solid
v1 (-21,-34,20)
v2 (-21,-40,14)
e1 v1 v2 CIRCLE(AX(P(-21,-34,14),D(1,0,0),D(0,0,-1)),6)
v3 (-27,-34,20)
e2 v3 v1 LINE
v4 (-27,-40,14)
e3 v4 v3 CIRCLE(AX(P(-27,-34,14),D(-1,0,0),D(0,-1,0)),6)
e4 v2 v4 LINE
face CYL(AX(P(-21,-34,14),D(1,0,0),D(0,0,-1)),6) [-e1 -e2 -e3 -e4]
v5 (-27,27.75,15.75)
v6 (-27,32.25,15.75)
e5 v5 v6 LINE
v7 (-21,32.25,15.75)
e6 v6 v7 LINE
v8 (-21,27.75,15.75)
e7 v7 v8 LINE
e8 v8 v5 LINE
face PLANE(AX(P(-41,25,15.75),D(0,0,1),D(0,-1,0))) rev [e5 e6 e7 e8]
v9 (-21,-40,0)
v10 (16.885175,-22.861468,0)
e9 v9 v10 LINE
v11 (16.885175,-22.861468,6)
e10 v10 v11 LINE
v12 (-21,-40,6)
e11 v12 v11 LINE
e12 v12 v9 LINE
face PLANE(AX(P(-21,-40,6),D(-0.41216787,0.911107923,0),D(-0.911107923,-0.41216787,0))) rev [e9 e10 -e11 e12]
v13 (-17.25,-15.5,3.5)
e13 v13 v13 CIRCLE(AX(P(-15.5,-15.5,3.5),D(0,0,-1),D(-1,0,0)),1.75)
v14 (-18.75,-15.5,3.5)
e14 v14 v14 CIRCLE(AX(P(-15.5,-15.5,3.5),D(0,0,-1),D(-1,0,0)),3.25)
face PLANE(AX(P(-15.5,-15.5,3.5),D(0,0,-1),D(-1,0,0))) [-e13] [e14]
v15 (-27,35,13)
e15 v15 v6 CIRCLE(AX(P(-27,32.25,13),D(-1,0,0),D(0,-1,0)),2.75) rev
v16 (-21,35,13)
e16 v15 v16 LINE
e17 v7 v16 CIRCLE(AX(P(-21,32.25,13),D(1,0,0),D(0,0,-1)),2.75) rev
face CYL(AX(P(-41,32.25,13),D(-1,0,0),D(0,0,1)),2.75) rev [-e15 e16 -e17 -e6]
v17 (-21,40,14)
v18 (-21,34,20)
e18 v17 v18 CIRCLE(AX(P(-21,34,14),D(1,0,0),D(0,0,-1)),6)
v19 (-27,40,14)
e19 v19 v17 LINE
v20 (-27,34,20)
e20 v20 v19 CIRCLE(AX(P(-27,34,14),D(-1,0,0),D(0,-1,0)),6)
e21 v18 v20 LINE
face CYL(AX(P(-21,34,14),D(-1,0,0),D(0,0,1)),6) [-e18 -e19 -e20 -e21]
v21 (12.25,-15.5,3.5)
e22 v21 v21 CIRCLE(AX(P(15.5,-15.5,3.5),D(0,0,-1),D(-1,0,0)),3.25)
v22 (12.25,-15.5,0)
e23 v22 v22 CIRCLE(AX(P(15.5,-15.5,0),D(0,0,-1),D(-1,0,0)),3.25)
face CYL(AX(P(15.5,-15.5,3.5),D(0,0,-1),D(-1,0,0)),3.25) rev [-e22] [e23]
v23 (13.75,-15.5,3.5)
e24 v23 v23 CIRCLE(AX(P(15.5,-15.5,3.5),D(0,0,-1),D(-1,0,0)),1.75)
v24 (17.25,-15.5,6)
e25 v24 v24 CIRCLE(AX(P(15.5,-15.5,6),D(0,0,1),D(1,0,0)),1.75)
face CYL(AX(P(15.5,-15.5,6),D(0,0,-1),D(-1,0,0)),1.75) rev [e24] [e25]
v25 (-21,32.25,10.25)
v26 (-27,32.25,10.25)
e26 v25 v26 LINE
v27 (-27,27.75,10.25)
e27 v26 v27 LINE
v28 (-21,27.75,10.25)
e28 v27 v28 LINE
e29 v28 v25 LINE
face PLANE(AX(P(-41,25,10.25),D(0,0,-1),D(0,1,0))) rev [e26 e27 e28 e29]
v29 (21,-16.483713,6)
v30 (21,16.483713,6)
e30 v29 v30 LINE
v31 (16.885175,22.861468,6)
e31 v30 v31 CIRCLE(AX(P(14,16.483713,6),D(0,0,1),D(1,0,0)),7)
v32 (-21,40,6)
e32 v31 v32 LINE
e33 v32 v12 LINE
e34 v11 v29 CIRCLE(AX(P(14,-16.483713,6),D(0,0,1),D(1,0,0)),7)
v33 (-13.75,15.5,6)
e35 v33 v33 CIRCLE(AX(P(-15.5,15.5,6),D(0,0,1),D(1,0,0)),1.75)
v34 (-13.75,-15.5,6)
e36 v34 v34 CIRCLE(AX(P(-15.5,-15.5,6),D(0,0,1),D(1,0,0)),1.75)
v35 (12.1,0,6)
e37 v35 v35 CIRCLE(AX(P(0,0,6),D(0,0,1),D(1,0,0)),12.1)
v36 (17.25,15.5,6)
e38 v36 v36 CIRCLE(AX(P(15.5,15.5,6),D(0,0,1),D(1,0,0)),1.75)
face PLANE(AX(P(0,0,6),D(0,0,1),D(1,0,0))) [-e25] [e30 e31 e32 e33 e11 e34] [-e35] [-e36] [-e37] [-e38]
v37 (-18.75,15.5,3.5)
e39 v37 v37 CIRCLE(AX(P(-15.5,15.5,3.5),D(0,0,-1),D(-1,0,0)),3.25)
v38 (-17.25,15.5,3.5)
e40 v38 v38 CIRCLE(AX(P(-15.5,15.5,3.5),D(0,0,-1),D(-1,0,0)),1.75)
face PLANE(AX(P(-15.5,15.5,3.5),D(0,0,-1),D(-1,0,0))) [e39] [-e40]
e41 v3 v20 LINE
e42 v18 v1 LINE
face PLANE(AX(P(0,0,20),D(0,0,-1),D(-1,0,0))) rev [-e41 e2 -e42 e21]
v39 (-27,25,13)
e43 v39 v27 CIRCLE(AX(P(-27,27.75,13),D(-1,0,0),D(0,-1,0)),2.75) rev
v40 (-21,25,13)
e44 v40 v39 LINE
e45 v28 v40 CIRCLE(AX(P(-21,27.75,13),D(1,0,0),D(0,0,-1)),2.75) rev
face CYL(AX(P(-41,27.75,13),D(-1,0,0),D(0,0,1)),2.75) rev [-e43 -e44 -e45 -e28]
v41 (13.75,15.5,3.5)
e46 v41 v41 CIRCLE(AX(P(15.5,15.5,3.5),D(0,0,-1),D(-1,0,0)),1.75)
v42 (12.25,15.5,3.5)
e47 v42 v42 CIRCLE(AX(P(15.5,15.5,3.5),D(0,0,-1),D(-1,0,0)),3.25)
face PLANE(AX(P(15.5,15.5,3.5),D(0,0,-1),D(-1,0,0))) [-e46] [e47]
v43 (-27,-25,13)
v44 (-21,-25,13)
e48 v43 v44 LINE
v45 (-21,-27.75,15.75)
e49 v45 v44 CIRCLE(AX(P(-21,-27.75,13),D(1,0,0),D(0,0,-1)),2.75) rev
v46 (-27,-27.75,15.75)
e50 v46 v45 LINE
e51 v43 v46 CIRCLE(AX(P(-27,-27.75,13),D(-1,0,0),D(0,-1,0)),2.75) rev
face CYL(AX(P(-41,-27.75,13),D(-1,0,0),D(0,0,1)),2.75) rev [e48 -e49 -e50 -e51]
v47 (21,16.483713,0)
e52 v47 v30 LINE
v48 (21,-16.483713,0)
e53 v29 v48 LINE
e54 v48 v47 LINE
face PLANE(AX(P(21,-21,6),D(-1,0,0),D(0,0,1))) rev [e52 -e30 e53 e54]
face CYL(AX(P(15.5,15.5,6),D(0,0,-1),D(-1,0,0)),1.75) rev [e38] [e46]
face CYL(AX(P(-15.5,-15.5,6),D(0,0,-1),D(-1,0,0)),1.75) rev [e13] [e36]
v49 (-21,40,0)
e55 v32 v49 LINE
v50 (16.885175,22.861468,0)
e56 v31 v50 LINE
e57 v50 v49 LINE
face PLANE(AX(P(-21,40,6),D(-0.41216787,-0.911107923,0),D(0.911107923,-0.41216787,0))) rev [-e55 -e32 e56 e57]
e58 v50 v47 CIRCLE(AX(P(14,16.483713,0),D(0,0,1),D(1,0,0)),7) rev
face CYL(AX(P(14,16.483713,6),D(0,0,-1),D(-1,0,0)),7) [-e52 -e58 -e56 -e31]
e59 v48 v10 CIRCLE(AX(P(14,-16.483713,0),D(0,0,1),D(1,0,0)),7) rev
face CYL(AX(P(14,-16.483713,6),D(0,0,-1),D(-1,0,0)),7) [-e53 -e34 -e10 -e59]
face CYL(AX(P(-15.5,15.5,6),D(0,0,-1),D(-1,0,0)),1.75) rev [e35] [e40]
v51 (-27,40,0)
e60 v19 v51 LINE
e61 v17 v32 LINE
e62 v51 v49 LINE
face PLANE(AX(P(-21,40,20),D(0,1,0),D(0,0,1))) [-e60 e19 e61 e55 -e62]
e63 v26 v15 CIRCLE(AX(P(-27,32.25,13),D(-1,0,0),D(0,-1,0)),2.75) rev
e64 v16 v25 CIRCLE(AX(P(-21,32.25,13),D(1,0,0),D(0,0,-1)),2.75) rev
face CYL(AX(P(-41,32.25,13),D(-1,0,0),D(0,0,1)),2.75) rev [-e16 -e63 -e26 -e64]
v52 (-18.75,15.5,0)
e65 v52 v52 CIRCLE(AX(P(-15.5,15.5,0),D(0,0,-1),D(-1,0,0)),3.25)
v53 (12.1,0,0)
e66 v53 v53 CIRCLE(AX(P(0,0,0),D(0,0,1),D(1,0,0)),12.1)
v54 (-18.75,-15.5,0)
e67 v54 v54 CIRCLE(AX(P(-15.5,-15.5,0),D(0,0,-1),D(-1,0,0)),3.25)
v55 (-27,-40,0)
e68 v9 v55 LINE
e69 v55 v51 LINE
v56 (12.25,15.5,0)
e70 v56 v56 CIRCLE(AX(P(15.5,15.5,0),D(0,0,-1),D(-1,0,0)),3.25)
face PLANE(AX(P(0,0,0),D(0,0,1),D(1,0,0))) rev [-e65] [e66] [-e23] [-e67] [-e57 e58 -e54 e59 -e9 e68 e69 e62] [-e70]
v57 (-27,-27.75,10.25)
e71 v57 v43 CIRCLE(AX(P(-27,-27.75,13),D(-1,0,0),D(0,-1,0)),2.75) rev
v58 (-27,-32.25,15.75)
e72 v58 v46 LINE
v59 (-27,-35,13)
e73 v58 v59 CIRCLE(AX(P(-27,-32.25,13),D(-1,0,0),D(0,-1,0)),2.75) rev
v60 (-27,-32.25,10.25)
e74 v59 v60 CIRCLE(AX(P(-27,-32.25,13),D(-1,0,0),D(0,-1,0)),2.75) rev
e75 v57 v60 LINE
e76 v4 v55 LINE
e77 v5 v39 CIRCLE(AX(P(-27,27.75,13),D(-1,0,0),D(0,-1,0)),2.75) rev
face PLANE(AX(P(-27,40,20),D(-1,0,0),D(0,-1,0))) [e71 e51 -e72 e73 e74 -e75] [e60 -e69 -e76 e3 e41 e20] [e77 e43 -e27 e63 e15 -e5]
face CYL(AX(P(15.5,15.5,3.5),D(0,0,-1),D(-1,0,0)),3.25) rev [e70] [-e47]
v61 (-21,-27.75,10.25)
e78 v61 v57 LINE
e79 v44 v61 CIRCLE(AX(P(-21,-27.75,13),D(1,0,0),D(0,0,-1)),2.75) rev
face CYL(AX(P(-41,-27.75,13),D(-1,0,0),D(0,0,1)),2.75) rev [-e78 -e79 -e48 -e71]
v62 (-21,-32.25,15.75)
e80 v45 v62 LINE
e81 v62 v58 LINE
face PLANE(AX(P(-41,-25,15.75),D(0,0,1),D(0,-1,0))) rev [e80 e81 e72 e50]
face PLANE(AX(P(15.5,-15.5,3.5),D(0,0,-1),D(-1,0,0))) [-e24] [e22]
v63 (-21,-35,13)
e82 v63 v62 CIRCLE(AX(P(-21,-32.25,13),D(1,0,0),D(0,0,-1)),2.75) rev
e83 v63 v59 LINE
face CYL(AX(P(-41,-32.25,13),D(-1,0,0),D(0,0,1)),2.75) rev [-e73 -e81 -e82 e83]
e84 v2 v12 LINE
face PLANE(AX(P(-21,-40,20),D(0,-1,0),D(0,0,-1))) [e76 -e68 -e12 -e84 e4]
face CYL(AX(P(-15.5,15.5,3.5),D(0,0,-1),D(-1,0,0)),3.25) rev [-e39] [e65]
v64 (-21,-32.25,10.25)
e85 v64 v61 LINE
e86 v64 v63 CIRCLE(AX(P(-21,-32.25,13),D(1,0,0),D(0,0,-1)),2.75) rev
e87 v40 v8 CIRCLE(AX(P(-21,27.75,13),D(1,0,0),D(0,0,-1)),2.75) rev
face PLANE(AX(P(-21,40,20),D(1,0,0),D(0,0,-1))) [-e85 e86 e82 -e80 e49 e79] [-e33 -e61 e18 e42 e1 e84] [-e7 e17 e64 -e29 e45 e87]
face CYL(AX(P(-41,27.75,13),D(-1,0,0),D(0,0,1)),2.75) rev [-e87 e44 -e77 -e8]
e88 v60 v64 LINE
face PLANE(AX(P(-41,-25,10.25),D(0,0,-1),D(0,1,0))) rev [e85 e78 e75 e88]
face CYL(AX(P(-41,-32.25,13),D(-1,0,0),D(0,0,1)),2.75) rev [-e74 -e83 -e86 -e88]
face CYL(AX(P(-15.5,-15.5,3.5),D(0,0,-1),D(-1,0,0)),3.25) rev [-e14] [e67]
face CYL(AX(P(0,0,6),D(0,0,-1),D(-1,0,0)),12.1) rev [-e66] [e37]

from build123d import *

# Parameters (mm, degrees)
SKETCH1_R           = 12.1
SKETCH1_R_2         = 1.75
BOSS_EXTRUDE1_DEPTH = 6
SKETCH2_R           = 3.25
CUT_EXTRUDE1_DEPTH  = 3.5
FILLET2_R           = 7
SKETCH4_W           = 6
SKETCH4_H           = 80
BOSS_EXTRUDE2_DEPTH = 20
SKETCH5_W           = 5.5
SKETCH5_H           = 10
CUT_EXTRUDE2_DEPTH  = 20
FILLET3_R           = 2.75
FILLET4_R           = 6


with BuildPart() as part:
    # Sketch1 → Boss-Extrude1 (new body)
    with BuildSketch(Plane.XY):
        Polygon((21, -21), (21, 21), (-21, 40), (-21, -40), align=None)
        Circle(SKETCH1_R, mode=Mode.SUBTRACT)
        with Locations((15.5, 15.5)):
            Circle(SKETCH1_R_2, mode=Mode.SUBTRACT)
        with Locations((15.5, -15.5)):
            Circle(SKETCH1_R_2, mode=Mode.SUBTRACT)
        with Locations((-15.5, -15.5)):
            Circle(SKETCH1_R_2, mode=Mode.SUBTRACT)
        with Locations((-15.5, 15.5)):
            Circle(SKETCH1_R_2, mode=Mode.SUBTRACT)
    extrude(amount=BOSS_EXTRUDE1_DEPTH)

    # Sketch2 → Cut-Extrude1 (cut)
    with BuildSketch(Plane(origin=(0, 0, 0), x_dir=(-1, 0, 0), z_dir=(0, 0, -1))):
        with Locations((-15.5, 15.5)):
            Circle(SKETCH2_R)
        with Locations((15.5, 15.5)):
            Circle(SKETCH2_R)
        with Locations((15.5, -15.5)):
            Circle(SKETCH2_R)
        with Locations((-15.5, -15.5)):
            Circle(SKETCH2_R)
    extrude(amount=-CUT_EXTRUDE1_DEPTH, mode=Mode.SUBTRACT)

    # Fillet2
    fillet2_edges = [part.edges().sort_by_distance(p)[0] for p in [
        (21, 21, 3),
        (21, -21, 3),
    ]]
    fillet(fillet2_edges, radius=FILLET2_R)

    # Sketch4 → Boss-Extrude2 (add)
    with BuildSketch(Plane(origin=(0, 0, 0), x_dir=(-1, 0, 0), z_dir=(0, 0, -1))):
        with Locations((24, 0)):
            Rectangle(SKETCH4_W, SKETCH4_H)
    extrude(amount=-BOSS_EXTRUDE2_DEPTH)

    # Sketch5 → Cut-Extrude2 (cut)
    with BuildSketch(Plane(origin=(-21, 0, 0), x_dir=(0, 0, -1), z_dir=(1, 0, 0))):
        with Locations((-13, -30)):
            Rectangle(SKETCH5_W, SKETCH5_H)
        with Locations((-13, 30)):
            Rectangle(SKETCH5_W, SKETCH5_H)
    extrude(amount=-CUT_EXTRUDE2_DEPTH, mode=Mode.SUBTRACT)

    # Fillet3
    fillet3_edges = [part.edges().sort_by_distance(p)[0] for p in [
        (-24, -25, 15.75),
        (-24, -25, 10.25),
        (-24, -35, 15.75),
        (-24, -35, 10.25),
        (-24, 35, 15.75),
        (-24, 25, 15.75),
        (-24, 25, 10.25),
        (-24, 35, 10.25),
    ]]
    fillet(fillet3_edges, radius=FILLET3_R - 0.0001)  # a hair under: the kernel refuses the full size

    # Fillet4
    fillet4_edges = [part.edges().sort_by_distance(p)[0] for p in [
        (-24, 40, 20),
        (-24, -40, 20),
    ]]
    fillet(fillet4_edges, radius=FILLET4_R)


solid = part.part
